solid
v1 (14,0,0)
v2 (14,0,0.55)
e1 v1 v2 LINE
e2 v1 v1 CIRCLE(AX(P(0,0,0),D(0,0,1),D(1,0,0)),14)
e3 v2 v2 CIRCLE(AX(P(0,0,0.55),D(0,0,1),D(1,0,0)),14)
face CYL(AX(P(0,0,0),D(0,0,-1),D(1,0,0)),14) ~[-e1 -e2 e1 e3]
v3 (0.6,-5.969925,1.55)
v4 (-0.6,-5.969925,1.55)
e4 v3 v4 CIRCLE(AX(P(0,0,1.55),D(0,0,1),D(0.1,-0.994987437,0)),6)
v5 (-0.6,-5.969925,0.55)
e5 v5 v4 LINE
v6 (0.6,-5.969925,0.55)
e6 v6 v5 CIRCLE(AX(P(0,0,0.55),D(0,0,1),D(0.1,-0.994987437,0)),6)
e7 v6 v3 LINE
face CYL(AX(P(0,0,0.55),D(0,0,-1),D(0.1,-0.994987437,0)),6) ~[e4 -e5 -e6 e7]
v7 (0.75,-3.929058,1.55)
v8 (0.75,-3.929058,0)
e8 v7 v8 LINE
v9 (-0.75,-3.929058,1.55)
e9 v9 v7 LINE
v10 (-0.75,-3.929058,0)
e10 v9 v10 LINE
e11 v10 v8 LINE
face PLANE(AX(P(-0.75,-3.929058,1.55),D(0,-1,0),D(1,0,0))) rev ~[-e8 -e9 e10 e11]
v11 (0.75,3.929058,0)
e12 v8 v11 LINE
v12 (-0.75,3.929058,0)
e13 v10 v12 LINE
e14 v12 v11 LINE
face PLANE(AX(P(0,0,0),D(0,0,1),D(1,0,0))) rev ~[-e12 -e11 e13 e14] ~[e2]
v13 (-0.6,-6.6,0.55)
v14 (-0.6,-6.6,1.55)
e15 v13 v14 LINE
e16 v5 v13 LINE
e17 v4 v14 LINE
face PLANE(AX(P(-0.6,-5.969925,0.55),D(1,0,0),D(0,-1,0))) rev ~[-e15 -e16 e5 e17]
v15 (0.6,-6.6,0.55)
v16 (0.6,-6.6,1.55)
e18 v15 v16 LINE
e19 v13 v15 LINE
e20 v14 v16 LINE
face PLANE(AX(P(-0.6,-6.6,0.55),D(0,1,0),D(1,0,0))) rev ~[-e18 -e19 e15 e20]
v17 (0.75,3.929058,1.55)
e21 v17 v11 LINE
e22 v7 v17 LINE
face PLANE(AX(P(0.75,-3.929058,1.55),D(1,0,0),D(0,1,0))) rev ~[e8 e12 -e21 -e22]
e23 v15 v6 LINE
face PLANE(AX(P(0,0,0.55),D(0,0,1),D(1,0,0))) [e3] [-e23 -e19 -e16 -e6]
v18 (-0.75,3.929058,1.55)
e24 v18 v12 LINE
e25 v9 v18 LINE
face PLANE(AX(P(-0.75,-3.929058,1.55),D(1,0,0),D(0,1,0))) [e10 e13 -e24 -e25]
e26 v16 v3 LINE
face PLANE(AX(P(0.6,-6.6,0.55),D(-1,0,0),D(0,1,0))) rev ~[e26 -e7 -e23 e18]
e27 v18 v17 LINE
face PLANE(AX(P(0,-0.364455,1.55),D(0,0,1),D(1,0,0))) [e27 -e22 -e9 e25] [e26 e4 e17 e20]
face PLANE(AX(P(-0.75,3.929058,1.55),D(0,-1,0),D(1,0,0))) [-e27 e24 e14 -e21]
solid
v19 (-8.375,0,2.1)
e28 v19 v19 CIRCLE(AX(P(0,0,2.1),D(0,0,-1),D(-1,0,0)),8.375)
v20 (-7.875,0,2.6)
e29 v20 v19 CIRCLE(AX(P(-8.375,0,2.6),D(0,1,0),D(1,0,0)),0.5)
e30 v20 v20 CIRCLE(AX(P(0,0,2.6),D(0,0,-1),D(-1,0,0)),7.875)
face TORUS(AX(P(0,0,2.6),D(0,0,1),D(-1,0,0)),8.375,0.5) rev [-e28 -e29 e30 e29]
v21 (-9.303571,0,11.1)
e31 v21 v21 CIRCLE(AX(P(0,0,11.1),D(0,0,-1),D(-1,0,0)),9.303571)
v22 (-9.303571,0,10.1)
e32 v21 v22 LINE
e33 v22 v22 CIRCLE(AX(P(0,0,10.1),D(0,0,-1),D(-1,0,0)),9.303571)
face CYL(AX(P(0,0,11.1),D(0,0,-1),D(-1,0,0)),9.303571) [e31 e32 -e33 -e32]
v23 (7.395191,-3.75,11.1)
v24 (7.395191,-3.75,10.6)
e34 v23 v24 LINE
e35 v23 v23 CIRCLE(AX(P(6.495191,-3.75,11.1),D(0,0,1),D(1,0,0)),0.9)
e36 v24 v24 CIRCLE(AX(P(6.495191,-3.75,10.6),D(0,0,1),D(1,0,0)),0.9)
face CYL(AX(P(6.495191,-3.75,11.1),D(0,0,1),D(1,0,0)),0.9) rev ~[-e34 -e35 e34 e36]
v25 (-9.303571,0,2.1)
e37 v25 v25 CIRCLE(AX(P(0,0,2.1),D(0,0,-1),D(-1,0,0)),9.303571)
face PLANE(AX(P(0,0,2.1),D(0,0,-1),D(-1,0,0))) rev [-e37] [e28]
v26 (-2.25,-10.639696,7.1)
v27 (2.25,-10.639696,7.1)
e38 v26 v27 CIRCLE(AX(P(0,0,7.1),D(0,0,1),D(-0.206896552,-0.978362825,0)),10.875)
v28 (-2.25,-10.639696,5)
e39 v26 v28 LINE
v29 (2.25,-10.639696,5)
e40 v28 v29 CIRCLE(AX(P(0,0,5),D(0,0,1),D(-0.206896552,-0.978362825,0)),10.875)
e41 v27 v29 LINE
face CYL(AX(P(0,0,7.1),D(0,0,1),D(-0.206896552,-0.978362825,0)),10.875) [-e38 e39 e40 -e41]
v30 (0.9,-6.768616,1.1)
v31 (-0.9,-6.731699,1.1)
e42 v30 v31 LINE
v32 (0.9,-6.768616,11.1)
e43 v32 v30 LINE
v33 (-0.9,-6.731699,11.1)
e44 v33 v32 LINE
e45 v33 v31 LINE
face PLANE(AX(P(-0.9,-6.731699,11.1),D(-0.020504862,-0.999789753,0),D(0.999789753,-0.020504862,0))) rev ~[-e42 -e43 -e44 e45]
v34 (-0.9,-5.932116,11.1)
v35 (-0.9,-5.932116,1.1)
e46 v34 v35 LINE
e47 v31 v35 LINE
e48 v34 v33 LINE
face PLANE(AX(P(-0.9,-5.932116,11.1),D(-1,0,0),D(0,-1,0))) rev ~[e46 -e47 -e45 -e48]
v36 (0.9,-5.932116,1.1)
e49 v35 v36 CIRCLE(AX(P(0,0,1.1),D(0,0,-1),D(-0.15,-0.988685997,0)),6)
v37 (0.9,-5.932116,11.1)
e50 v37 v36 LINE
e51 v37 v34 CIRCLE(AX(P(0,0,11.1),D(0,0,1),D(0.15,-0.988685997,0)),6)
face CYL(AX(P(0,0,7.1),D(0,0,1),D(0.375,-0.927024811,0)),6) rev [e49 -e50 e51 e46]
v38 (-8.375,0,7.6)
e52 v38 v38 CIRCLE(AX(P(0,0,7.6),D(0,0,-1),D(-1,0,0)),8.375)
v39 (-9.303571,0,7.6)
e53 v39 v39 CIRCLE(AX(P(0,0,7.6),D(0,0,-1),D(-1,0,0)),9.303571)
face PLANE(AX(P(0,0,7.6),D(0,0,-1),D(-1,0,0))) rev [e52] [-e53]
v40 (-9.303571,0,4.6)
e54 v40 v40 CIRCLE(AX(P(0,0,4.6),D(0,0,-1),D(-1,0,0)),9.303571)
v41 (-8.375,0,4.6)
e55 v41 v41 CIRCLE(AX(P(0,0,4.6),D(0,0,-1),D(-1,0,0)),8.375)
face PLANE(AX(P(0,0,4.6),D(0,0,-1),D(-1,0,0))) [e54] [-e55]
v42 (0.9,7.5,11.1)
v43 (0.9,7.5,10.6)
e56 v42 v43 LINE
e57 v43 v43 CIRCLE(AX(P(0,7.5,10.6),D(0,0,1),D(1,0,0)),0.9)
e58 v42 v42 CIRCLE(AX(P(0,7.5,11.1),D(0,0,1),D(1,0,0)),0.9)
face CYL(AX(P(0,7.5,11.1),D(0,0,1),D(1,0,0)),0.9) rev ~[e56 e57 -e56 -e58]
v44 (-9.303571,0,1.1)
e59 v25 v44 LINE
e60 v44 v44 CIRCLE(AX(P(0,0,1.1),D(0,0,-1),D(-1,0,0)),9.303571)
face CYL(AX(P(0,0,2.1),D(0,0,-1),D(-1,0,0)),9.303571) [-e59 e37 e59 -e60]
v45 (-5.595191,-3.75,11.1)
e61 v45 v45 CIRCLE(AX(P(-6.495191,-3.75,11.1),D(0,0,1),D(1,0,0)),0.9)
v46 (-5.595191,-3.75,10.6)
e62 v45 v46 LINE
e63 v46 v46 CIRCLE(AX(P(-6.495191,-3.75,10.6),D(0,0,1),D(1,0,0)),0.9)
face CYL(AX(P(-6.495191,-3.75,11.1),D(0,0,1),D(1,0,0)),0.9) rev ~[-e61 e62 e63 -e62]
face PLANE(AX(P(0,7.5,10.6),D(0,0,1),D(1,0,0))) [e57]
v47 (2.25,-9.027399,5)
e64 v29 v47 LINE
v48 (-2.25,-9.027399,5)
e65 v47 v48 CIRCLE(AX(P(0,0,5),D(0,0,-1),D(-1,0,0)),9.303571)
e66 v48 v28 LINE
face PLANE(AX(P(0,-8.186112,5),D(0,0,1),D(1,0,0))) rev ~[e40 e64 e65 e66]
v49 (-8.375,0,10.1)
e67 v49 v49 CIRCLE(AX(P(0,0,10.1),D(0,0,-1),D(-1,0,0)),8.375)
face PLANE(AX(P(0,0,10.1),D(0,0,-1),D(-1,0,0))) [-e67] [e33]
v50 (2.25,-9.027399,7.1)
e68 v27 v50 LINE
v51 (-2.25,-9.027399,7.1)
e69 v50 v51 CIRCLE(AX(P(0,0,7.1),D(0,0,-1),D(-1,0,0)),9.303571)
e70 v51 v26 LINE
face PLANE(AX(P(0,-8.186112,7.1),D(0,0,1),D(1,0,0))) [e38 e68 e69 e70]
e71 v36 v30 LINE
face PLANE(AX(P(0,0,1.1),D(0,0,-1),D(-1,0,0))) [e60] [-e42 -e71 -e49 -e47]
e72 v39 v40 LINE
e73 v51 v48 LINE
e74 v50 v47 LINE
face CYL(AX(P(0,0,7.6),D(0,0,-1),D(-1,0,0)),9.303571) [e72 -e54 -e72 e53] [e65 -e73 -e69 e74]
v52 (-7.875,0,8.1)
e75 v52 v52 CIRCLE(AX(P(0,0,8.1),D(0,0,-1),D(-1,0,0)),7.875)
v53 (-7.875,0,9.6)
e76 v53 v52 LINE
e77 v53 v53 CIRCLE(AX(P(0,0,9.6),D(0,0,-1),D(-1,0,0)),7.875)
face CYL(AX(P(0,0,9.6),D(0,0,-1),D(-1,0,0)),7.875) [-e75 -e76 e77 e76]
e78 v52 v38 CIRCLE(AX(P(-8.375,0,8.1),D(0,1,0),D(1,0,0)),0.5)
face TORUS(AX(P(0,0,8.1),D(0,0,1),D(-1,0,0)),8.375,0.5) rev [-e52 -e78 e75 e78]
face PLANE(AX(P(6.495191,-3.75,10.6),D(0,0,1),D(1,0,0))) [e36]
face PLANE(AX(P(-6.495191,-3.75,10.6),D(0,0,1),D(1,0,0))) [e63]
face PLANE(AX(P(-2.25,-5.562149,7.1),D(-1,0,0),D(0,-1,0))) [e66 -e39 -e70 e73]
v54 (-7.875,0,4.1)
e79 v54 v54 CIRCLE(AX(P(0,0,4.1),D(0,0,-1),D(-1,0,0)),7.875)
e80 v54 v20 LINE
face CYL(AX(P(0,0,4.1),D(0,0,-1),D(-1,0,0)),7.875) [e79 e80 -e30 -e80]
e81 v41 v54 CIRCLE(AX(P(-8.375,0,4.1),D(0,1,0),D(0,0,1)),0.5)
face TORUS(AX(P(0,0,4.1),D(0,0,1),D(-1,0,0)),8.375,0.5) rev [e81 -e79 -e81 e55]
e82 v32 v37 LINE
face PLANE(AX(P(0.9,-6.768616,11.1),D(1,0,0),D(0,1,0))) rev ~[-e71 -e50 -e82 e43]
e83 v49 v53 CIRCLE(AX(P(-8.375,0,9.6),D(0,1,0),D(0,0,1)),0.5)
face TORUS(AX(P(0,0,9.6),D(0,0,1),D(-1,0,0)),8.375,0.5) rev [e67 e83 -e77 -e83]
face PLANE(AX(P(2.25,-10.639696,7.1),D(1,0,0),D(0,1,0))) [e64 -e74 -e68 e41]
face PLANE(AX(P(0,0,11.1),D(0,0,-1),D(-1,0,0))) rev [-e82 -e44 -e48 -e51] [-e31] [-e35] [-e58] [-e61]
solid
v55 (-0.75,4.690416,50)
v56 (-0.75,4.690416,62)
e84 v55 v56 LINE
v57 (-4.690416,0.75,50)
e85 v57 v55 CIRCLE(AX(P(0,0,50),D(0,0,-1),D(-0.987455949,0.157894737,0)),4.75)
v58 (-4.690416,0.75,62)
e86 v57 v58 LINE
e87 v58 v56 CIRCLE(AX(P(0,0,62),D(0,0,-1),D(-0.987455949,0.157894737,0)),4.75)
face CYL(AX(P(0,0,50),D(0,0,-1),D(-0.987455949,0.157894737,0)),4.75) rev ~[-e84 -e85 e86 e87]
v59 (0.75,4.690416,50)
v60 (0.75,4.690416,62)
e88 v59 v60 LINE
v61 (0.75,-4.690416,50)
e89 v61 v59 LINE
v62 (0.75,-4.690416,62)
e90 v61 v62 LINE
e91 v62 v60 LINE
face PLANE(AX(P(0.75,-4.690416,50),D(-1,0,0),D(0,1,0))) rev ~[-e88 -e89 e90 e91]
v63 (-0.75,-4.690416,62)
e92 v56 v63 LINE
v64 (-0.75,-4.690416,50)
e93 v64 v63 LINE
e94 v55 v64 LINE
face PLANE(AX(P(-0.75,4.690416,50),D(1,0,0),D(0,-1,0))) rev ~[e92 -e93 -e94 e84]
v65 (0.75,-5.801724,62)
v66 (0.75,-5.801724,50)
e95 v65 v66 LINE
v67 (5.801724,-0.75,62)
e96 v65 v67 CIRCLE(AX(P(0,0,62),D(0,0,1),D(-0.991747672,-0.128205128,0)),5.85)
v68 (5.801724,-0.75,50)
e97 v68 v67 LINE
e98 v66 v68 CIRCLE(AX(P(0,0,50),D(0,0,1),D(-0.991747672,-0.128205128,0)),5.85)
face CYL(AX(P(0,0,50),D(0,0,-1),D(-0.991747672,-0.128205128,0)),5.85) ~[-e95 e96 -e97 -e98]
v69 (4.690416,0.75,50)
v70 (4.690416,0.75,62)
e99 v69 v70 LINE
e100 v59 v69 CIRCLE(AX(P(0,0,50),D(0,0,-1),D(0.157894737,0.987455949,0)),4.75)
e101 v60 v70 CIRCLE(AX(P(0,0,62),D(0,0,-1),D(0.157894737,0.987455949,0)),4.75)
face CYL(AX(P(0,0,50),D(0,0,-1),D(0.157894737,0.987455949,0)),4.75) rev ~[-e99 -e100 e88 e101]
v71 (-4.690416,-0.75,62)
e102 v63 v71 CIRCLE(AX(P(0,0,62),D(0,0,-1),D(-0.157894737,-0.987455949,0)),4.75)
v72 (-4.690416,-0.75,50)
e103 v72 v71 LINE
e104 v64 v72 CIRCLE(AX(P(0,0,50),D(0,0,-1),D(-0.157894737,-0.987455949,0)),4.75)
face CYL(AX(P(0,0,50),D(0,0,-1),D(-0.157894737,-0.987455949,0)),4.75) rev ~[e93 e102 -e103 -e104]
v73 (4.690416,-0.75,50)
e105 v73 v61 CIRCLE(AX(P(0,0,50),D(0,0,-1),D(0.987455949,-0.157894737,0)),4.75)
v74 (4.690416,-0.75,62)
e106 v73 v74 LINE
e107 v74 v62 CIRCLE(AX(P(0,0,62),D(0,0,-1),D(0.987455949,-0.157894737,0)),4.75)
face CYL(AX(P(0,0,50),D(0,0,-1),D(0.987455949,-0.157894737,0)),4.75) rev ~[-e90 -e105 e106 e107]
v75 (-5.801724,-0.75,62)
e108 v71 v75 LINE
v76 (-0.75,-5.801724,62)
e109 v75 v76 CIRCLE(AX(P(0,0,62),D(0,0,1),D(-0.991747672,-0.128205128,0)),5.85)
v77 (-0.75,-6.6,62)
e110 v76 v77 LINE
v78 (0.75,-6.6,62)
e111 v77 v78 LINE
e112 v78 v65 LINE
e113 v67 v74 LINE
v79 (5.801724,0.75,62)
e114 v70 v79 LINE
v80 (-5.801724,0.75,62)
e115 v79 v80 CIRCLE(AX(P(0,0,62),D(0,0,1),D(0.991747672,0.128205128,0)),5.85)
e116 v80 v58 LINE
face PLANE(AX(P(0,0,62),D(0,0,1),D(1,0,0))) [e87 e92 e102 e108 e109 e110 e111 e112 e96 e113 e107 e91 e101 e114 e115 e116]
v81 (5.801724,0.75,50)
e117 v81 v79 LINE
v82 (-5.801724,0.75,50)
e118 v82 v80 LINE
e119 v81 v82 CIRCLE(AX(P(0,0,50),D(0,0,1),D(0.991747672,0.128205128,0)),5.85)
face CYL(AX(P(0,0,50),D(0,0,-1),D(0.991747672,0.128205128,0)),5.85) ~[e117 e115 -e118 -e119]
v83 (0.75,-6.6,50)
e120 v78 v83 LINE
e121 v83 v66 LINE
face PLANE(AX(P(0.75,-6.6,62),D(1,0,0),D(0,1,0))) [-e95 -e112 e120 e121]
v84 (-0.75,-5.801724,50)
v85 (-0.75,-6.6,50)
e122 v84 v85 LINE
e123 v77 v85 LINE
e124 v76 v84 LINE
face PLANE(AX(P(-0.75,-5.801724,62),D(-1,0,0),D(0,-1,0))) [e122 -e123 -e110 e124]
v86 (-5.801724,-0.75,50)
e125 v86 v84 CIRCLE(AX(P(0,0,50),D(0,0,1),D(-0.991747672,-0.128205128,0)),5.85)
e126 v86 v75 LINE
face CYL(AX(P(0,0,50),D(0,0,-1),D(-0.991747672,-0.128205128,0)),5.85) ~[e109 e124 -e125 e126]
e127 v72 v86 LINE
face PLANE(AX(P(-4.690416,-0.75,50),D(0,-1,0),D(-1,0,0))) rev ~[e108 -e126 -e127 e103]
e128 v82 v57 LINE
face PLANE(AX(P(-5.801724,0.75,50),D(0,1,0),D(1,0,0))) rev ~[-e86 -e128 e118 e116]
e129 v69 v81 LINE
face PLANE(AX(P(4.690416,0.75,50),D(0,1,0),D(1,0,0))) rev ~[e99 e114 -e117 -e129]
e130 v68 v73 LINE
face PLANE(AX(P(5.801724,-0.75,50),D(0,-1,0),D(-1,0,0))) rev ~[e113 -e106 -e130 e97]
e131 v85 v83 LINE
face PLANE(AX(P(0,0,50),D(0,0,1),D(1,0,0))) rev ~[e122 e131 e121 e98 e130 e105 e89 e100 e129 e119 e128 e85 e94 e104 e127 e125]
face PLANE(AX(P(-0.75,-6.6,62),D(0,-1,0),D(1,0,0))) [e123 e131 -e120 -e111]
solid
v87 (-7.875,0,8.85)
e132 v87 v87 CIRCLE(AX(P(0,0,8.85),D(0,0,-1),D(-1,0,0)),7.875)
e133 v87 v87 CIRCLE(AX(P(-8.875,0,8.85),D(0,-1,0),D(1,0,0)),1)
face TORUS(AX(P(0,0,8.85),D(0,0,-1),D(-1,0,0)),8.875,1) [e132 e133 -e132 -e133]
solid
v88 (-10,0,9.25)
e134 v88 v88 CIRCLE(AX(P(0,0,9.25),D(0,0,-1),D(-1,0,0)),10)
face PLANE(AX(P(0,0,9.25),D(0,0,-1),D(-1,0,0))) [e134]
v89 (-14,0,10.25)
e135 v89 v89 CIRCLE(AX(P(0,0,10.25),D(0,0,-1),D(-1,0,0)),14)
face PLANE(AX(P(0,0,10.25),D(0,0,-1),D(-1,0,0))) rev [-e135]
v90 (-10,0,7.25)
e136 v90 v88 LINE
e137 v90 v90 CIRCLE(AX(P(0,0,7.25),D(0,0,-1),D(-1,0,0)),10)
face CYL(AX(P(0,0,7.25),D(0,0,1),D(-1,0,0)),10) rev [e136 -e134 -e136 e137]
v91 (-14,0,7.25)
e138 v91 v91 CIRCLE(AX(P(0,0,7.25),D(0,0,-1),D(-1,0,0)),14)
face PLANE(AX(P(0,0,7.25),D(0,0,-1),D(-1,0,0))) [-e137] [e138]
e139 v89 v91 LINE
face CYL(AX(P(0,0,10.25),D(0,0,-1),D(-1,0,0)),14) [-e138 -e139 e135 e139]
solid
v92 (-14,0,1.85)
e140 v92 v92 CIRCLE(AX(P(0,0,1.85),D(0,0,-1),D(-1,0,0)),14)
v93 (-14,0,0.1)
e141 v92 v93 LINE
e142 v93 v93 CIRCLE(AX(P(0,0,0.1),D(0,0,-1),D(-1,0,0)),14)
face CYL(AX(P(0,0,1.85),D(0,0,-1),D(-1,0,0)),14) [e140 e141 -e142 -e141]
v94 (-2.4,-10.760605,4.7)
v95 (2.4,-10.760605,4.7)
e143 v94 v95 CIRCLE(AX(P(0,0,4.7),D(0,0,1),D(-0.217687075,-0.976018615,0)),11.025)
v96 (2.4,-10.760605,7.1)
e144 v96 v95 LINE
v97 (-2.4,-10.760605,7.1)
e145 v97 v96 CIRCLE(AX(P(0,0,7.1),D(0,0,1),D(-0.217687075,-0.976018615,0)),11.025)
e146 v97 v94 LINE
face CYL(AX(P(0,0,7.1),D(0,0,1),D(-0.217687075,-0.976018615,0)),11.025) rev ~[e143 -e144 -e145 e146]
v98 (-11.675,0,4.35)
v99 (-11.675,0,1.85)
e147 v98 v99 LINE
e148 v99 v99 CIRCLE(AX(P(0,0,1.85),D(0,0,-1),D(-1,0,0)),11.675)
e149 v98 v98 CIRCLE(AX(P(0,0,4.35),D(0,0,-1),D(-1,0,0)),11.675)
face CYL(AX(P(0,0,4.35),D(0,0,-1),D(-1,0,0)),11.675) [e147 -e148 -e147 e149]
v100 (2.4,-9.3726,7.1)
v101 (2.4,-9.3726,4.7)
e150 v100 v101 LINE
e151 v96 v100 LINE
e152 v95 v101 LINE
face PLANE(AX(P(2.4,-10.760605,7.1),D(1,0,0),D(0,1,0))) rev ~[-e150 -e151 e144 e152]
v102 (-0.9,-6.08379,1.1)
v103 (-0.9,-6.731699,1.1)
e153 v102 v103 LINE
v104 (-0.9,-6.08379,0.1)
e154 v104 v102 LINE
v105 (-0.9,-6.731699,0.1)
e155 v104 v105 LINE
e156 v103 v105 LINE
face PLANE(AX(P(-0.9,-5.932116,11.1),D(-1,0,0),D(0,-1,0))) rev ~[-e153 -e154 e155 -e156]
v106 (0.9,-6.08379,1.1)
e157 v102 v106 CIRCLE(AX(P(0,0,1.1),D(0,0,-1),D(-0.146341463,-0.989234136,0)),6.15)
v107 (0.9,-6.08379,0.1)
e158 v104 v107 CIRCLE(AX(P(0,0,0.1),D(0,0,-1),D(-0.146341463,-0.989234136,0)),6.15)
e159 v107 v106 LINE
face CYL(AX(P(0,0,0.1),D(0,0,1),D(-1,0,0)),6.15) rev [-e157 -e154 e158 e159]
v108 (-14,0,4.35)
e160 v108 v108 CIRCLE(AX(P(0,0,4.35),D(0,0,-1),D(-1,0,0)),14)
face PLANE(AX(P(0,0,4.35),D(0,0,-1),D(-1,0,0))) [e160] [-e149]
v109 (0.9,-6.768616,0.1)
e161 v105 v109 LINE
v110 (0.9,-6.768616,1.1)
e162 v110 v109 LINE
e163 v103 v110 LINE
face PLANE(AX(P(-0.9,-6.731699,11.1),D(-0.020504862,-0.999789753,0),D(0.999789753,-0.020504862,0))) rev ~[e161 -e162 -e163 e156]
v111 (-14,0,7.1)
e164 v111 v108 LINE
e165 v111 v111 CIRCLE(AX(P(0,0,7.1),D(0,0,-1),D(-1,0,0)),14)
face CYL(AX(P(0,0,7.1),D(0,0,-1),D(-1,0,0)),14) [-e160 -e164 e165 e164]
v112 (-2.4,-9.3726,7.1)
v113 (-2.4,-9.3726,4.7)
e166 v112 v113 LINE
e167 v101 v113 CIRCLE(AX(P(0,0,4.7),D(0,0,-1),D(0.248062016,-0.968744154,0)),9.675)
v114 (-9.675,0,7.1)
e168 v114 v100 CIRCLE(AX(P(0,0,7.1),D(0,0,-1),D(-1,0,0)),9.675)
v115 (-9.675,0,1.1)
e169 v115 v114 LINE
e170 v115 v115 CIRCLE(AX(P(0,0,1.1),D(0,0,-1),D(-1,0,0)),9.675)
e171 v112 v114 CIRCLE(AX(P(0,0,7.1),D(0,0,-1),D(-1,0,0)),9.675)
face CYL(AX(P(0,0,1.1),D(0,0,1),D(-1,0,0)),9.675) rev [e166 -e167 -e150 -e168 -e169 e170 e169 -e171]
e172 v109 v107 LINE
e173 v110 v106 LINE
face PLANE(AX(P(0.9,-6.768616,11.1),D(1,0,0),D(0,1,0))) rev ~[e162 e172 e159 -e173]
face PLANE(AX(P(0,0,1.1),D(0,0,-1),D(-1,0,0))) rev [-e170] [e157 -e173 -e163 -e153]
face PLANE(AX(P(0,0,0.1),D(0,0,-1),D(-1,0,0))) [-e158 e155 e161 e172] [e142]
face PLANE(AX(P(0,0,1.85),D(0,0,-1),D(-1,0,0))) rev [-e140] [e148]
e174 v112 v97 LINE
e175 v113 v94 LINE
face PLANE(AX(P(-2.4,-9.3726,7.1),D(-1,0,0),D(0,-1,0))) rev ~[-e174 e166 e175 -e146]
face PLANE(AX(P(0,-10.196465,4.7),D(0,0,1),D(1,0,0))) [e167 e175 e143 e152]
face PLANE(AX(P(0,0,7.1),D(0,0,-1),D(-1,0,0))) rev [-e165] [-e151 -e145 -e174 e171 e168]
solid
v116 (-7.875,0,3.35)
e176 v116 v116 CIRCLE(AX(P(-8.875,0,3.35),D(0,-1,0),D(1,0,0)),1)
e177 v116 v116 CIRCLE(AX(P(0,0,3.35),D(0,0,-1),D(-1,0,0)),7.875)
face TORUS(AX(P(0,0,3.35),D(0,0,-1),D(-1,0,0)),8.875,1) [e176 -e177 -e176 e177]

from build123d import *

# Parameters (mm, degrees)
F7_R      = 14
F8_DEPTH  = 0.55
F10_DEPTH = 1
F11_W     = 1.5
F11_H     = 7.8581168228
F12_DEPTH = 1.55
F19_DEPTH = 12
F20_R     = 1
F24_DEPTH = 2.4
F26_DEPTH = 2.1
F28_DEPTH = 11
F30_DEPTH = 12
F31_R     = 0.9
F32_DEPTH = 0.5


with BuildPart() as f8:
    # F7 (on Top) → F8 (new body)
    with BuildSketch(Plane.XY):
        Circle(F7_R)
    extrude(amount=F8_DEPTH)

    # F9 (on face) → F10 (join)
    with BuildSketch(Plane.XY.offset(0.55)):
        with BuildLine():
            Line((0.6, -6.6), (0.6, -5.9699246226))
            ThreePointArc((0.6, -5.9699246226), (0, 6), (-0.6, -5.9699246226))
            Line((-0.6, -5.9699246226), (-0.6, -6.6))
            Line((-0.6, -6.6), (0.6, -6.6))
        make_face()
    extrude(amount=F10_DEPTH)

    # F11 (on face) → F12 (cut, through all)
    with BuildSketch(Plane.XY.offset(1.55)):
        Rectangle(F11_W, F11_H)
    extrude(amount=-F12_DEPTH, mode=Mode.SUBTRACT)


with BuildPart() as f14:
    # F13 (on Front) → F14 (revolve)
    with BuildSketch(Plane.XZ):
        Polygon((-9.675, 7.1), (-14, 7.1), (-14, 4.35), (-11.675, 4.35), (-11.675, 1.85), (-14, 1.85), (-14, 1.1), (-14, 0.1), (-9.675, 0.1), (-6.15, 0.1), (-6.15, 1.1), (-9.675, 1.1), align=None)
    revolve(axis=Axis((0, 0, 0.110375745), (0, 0, -1)))

    # F23 (on face) → F24 (cut)
    with BuildSketch(Plane.XY.offset(7.1)):
        with BuildLine():
            ThreePointArc((-2.4, -10.7606052339), (0, -11.025), (2.4, -10.7606052339))
            Line((2.4, -10.7606052339), (2.4, -9.3725996927))
            ThreePointArc((2.4, -9.3725996927), (0, -9.675), (-2.4, -9.3725996927))
            Line((-2.4, -9.3725996927), (-2.4, -10.7606052339))
        make_face()
    extrude(amount=-F24_DEPTH, mode=Mode.SUBTRACT)


with BuildPart() as f16:
    # F15 (on Front) → F16 (revolve)
    with BuildSketch(Plane.XZ):
        Polygon((0, 10.25), (-14, 10.25), (-14, 7.25), (-10, 7.25), (-10, 9.25), (0, 9.25), align=None)
    revolve(axis=Axis((0, 0, 0.110375745), (0, 0, -1)))


with BuildPart() as f19:
    # F18 (on offset) → F19 (new body)
    with BuildSketch(Plane.XY.offset(50)):
        with BuildLine():
            Line((-4.6904157598, -0.75), (-5.8017238817, -0.75))
            ThreePointArc((-5.8017238817, -0.75), (0, -5.85), (5.8017238817, -0.75))
            Line((5.8017238817, -0.75), (4.6904157598, -0.75))
            ThreePointArc((4.6904157598, -0.75), (3.3587572106, -3.3587572106), (0.75, -4.6904157598))
            Line((0.75, -4.6904157598), (0.75, 4.6904157598))
            ThreePointArc((0.75, 4.6904157598), (3.3587572106, 3.3587572106), (4.6904157598, 0.75))
            Line((4.6904157598, 0.75), (5.8017238817, 0.75))
            ThreePointArc((5.8017238817, 0.75), (0, 5.85), (-5.8017238817, 0.75))
            Line((-5.8017238817, 0.75), (-4.6904157598, 0.75))
            ThreePointArc((-4.6904157598, 0.75), (-3.3587572106, 3.3587572106), (-0.75, 4.6904157598))
            Line((-0.75, 4.6904157598), (-0.75, -4.6904157598))
            ThreePointArc((-0.75, -4.6904157598), (-3.3587572106, -3.3587572106), (-4.6904157598, -0.75))
        make_face()
    extrude(amount=F19_DEPTH)

    # F29 (on face) → F30 (join)
    with BuildSketch(Plane.XY.offset(62)):
        with BuildLine():
            Line((-0.75, -6.6), (0.75, -6.6))
            Line((0.75, -6.6), (0.75, -5.8017238817))
            ThreePointArc((0.75, -5.8017238817), (0, -5.85), (-0.75, -5.8017238817))
            Line((-0.75, -5.8017238817), (-0.75, -6.6))
        make_face()
    extrude(amount=-F30_DEPTH)


with BuildPart() as f21:
    # F20 (on Front) → F21 (revolve)
    with BuildSketch(Plane.XZ):
        with BuildLine():
            Line((-6, 11.1), (-9.3035714286, 11.1))
            Line((-9.3035714286, 11.1), (-9.3035714286, 10.1))
            Line((-9.3035714286, 10.1), (-8.375, 10.1))
            ThreePointArc((-8.375, 10.1), (-8.0214466094, 9.9535533906), (-7.875, 9.6))
            Line((-7.875, 9.6), (-7.875, 8.85))
            Line((-7.875, 8.85), (-7.875, 8.1))
            ThreePointArc((-7.875, 8.1), (-8.0214466094, 7.7464466094), (-8.375, 7.6))
            Line((-8.375, 7.6), (-9.3035714286, 7.6))
            Line((-9.3035714286, 7.6), (-9.3035714286, 4.6))
            Line((-9.3035714286, 4.6), (-8.375, 4.6))
            ThreePointArc((-8.375, 4.6), (-8.0214466094, 4.4535533906), (-7.875, 4.1))
            Line((-7.875, 4.1), (-7.875, 3.35))
            Line((-7.875, 3.35), (-7.875, 2.6))
            ThreePointArc((-7.875, 2.6), (-8.0214466094, 2.2464466094), (-8.375, 2.1))
            Line((-8.375, 2.1), (-9.3035714286, 2.1))
            Line((-9.3035714286, 2.1), (-9.3035714286, 1.1))
            Line((-9.3035714286, 1.1), (-6, 1.1))
            Line((-6, 1.1), (-6, 11.1))
        make_face()
    revolve(axis=Axis((0, 0, 4.9723982811), (0, 0, -1)))

    # F25 (on face) → F26 (join)
    with BuildSketch(Plane.XY.offset(7.1)):
        with BuildLine():
            Line((-2.25, -5.5621488653), (-2.25, -10.6396957193))
            ThreePointArc((-2.25, -10.6396957193), (0, -10.875), (2.25, -10.6396957193))
            Line((2.25, -10.6396957193), (2.25, -5.5621488653))
            ThreePointArc((2.25, -5.5621488653), (0, -6), (-2.25, -5.5621488653))
        make_face()
    extrude(amount=-F26_DEPTH)


with BuildPart() as f22:
    # F20 (on Front) → F22 (revolve)
    with BuildSketch(Plane.XZ):
        with Locations((-8.875, 8.85)):
            Circle(F20_R)
    revolve(axis=Axis((0, 0, 4.9723982811), (0, 0, -1)))


with BuildPart() as f22b:
    # F20 (on Front) → F22, piece 2 (revolve)
    with BuildSketch(Plane.XZ):
        with Locations((-8.875, 3.35)):
            Circle(F20_R)
    revolve(axis=Axis((0, 0, 4.9723982811), (0, 0, -1)))


with BuildPart() as f28_tool:
    # F27 (on face) → F28 (new body, through all)
    with BuildSketch(Plane.XY.offset(11.1)):
        with BuildLine():
            Line((-0.9, -6.7316994618), (0.9, -6.7686159747))
            Line((0.9, -6.7686159747), (0.9, -5.93211598))
            ThreePointArc((0.9, -5.93211598), (0, -6), (-0.9, -5.93211598))
            Line((-0.9, -5.93211598), (-0.9, -6.7316994618))
        make_face()
    extrude(amount=-F28_DEPTH)


with BuildPart() as f14_1:
    add(f14.part)

    # F28: cut by f28_tool
    add(f28_tool.part, mode=Mode.SUBTRACT)


with BuildPart() as f21_1:
    add(f21.part)

    # F28: cut by f28_tool
    add(f28_tool.part, mode=Mode.SUBTRACT)

    # F31 (on face) → F32 (cut)
    with BuildSketch(Plane.XY.offset(11.1)):
        with Locations((0, 7.5)):
            Circle(F31_R)
        with Locations((6.4951905374, -3.7499999845)):
            Circle(F31_R)
        with Locations((-6.4951905104, -3.7500000311)):
            Circle(F31_R)
    extrude(amount=-F32_DEPTH, mode=Mode.SUBTRACT)


solid = Compound([f8.part, f16.part, f19.part, f22.part, f22b.part, f14_1.part, f21_1.part])
